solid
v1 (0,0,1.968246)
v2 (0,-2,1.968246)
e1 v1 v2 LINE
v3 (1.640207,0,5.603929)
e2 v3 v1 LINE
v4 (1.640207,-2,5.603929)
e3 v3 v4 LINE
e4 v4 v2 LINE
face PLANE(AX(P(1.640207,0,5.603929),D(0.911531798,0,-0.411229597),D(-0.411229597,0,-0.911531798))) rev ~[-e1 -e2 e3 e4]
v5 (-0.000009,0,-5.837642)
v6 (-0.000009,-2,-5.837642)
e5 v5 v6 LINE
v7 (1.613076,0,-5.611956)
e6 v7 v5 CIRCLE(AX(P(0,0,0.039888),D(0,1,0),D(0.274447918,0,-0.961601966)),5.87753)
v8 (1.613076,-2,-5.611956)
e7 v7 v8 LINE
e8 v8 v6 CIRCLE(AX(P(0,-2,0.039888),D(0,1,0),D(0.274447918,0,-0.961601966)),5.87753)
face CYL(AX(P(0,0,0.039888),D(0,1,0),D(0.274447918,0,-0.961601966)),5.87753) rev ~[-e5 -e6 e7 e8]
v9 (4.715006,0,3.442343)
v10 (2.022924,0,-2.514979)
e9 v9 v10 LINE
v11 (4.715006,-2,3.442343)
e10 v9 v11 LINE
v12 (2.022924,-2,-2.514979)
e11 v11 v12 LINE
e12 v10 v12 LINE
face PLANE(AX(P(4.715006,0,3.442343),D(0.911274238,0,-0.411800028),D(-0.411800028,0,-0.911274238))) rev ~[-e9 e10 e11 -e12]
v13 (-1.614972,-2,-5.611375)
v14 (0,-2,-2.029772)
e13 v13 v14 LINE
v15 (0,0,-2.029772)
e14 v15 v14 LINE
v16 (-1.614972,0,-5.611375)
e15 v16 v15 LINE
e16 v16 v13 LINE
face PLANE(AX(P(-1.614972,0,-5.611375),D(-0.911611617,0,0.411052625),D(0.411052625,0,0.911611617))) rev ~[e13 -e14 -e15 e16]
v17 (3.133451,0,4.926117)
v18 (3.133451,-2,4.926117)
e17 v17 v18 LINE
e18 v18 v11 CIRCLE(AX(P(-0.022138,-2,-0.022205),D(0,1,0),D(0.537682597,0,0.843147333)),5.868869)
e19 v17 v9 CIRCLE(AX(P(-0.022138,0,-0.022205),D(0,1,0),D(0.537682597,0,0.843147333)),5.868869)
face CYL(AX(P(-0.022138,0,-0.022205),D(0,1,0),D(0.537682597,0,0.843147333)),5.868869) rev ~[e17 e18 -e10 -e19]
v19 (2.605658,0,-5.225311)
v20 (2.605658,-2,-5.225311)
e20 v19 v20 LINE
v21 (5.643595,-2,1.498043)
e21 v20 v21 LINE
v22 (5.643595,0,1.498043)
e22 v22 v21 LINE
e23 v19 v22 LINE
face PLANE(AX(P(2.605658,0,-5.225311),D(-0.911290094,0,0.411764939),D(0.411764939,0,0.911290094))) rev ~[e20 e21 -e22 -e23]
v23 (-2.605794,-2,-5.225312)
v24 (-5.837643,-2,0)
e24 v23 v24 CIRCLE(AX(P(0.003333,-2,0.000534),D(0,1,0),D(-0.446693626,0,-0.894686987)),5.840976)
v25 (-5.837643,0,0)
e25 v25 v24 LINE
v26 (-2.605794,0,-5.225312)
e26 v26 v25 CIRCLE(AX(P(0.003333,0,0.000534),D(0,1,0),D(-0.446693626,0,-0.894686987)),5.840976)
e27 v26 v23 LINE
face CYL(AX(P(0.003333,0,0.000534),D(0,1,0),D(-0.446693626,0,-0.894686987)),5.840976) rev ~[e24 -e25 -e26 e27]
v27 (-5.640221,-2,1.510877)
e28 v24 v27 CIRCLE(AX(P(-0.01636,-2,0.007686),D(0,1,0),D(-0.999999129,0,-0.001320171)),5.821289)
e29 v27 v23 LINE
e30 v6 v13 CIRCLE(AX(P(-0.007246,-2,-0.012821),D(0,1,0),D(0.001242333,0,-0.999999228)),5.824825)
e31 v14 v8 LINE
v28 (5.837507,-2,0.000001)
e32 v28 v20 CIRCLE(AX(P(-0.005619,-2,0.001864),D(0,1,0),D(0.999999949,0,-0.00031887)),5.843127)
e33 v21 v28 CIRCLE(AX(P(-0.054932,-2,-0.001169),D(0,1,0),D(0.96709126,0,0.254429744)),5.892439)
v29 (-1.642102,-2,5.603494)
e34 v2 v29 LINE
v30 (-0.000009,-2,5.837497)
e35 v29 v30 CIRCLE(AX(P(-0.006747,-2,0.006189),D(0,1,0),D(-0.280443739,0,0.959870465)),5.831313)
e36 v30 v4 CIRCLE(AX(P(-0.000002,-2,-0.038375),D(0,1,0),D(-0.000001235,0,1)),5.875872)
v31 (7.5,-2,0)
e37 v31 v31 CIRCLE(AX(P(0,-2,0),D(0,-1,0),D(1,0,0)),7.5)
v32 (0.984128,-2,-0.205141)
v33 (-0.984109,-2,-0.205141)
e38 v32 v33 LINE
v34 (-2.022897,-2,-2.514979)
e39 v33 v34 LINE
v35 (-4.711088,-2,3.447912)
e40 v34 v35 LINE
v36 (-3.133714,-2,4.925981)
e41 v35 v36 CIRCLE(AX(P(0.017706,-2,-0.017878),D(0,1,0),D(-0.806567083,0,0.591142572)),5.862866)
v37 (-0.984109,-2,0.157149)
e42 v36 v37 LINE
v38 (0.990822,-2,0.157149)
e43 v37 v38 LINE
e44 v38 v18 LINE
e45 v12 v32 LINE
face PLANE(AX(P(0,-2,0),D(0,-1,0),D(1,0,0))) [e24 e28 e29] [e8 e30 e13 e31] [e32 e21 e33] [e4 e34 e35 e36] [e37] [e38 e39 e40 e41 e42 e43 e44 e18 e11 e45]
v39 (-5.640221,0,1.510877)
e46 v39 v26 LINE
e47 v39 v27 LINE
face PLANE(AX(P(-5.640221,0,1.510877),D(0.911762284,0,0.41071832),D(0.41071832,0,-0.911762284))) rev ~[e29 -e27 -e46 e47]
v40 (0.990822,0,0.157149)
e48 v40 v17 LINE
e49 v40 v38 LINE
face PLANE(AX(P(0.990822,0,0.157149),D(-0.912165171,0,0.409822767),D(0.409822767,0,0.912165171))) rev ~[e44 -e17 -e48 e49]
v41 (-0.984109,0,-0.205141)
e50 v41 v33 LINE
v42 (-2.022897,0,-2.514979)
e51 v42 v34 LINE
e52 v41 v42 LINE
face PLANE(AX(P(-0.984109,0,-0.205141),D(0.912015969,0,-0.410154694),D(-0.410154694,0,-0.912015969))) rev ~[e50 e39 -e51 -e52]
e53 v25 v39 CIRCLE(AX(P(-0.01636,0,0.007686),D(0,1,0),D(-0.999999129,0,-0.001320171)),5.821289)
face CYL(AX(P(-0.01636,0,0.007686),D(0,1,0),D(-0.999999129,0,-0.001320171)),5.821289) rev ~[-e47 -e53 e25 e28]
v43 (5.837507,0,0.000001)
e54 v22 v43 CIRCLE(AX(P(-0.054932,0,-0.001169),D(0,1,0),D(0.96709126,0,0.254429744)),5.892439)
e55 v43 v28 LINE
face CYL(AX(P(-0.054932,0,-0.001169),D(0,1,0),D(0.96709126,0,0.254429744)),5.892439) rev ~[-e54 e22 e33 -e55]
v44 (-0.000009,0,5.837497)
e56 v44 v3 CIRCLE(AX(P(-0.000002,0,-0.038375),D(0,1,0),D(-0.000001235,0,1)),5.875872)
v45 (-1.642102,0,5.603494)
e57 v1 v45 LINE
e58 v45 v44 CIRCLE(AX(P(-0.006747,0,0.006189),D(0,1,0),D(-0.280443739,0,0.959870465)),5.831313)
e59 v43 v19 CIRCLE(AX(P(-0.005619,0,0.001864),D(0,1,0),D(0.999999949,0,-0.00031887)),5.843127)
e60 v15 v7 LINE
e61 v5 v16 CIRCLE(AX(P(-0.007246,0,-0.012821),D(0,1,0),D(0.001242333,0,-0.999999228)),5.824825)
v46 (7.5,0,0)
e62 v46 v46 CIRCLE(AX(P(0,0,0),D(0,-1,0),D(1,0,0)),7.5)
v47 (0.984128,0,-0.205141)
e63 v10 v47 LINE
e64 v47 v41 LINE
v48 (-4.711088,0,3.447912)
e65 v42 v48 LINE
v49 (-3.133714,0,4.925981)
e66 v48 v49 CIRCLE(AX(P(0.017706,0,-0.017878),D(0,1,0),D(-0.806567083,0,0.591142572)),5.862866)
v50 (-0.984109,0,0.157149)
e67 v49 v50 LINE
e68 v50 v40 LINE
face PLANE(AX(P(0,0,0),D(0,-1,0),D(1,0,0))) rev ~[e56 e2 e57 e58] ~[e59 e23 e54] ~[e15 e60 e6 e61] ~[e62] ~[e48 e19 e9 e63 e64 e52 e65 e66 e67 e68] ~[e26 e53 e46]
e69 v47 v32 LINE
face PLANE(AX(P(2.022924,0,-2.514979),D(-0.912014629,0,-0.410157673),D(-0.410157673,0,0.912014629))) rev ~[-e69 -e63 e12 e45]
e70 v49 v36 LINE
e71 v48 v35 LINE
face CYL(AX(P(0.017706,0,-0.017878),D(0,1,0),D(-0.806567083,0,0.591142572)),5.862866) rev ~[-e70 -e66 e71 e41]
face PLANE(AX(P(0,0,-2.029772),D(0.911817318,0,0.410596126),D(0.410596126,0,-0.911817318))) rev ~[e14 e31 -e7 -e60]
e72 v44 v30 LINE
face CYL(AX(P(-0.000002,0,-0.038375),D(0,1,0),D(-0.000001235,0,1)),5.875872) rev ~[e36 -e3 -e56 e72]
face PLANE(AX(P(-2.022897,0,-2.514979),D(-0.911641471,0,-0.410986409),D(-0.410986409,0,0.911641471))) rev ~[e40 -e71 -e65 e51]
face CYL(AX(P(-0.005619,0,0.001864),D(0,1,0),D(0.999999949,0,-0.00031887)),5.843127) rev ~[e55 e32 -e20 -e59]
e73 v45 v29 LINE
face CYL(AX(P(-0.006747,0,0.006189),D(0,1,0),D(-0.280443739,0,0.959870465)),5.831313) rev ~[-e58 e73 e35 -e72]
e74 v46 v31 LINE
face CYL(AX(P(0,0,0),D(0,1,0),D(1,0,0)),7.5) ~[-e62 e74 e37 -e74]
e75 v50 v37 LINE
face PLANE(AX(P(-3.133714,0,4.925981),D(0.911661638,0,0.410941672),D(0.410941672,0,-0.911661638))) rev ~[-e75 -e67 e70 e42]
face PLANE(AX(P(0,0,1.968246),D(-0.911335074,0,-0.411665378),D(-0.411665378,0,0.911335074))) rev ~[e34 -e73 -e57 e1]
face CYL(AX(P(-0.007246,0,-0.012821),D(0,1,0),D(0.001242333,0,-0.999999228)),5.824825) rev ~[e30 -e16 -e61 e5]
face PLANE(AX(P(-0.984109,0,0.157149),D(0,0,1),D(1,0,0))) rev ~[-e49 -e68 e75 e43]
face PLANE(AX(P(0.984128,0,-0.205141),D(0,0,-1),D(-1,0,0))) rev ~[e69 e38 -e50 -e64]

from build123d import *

# Parameters (mm, degrees)
F1_DEPTH = 2


# Not quite as in the source:
# - ends of sketch curves that miss each other by under 0.0002 mm in the source are joined


with BuildPart() as f1:
    # F0 (on Front) → F1 (new body)
    with BuildSketch(Plane.XZ):
        with BuildLine():
            ThreePointArc((-7.5, 0), (0, -7.5), (7.5, 0))
            ThreePointArc((7.5, 0), (0, 7.5), (-7.5, 0))
        make_face()
        with BuildLine():
            ThreePointArc((-9.252e-06, -5.837642026), (-0.8154481123, -5.781304427), (-1.6149720231, -5.6113751006))
            Line((-1.6149720231, -5.6113751006), (0, -2.0297722424))
            Line((0, -2.0297722424), (1.6130763481, -5.6119564271))
            ThreePointArc((1.6130763481, -5.6119564271), (0.8143893667, -5.7809478456), (-9.252e-06, -5.837642026))
        make_face(mode=Mode.SUBTRACT)
        with BuildLine():
            ThreePointArc((-5.8376432623, 4.535e-07), (-5.7885795806, 0.7619262356), (-5.6402209677, 1.5108774116))
            Line((-5.6402209677, 1.5108774116), (-2.6057938378, -5.2253115461))
            ThreePointArc((-2.6057938378, -5.2253115461), (-4.9642649621, -3.0719201723), (-5.8376432623, 4.535e-07))
        make_face(mode=Mode.SUBTRACT)
        with BuildLine():
            ThreePointArc((5.8375074432, 8.164e-07), (4.9638082552, -3.0717207498), (2.6056583249, -5.2253113695))
            Line((2.6056583249, -5.2253113695), (5.6435948014, 1.498042557))
            ThreePointArc((5.6435948014, 1.498042557), (5.7887533107, 0.7552604254), (5.8375074432, 8.164e-07))
        make_face(mode=Mode.SUBTRACT)
        with BuildLine():
            Line((0, 1.9682461262), (-1.6421023797, 5.6034935248))
            ThreePointArc((-1.6421023797, 5.6034935248), (-0.8294183969, 5.7791792496), (-8.9799e-06, 5.8374974962))
            ThreePointArc((-8.9799e-06, 5.8374974962), (0.8283723862, 5.7788128003), (1.6402065238, 5.6039289974))
            Line((1.6402065238, 5.6039289974), (0, 1.9682461262))
        make_face(mode=Mode.SUBTRACT)
        with BuildLine():
            Line((0.990821727, 0.1571487487), (3.1334508081, 4.9261166556))
            ThreePointArc((3.1334508081, 4.9261166556), (3.9933572695, 4.2579147754), (4.7150061526, 3.4423429304))
            Line((4.7150061526, 3.4423429304), (2.0229239131, -2.5149786417))
            Line((2.0229239131, -2.5149786417), (0.9841275984, -0.2051414777))
            Line((0.9841275984, -0.2051414777), (-0.9841094572, -0.2051414777))
            Line((-0.9841094572, -0.2051414777), (-2.0228967012, -2.5149786417))
            Line((-2.0228967012, -2.5149786417), (-4.7110881859, 3.447911577))
            ThreePointArc((-4.7110881859, 3.447911577), (-3.9911114988, 4.2602728506), (-3.1337140349, 4.925981317))
            Line((-3.1337140349, 4.925981317), (-0.9841094572, 0.1571487487))
            Line((-0.9841094572, 0.1571487487), (0.990821727, 0.1571487487))
        make_face(mode=Mode.SUBTRACT)
    extrude(amount=F1_DEPTH)


solid = f1.part
